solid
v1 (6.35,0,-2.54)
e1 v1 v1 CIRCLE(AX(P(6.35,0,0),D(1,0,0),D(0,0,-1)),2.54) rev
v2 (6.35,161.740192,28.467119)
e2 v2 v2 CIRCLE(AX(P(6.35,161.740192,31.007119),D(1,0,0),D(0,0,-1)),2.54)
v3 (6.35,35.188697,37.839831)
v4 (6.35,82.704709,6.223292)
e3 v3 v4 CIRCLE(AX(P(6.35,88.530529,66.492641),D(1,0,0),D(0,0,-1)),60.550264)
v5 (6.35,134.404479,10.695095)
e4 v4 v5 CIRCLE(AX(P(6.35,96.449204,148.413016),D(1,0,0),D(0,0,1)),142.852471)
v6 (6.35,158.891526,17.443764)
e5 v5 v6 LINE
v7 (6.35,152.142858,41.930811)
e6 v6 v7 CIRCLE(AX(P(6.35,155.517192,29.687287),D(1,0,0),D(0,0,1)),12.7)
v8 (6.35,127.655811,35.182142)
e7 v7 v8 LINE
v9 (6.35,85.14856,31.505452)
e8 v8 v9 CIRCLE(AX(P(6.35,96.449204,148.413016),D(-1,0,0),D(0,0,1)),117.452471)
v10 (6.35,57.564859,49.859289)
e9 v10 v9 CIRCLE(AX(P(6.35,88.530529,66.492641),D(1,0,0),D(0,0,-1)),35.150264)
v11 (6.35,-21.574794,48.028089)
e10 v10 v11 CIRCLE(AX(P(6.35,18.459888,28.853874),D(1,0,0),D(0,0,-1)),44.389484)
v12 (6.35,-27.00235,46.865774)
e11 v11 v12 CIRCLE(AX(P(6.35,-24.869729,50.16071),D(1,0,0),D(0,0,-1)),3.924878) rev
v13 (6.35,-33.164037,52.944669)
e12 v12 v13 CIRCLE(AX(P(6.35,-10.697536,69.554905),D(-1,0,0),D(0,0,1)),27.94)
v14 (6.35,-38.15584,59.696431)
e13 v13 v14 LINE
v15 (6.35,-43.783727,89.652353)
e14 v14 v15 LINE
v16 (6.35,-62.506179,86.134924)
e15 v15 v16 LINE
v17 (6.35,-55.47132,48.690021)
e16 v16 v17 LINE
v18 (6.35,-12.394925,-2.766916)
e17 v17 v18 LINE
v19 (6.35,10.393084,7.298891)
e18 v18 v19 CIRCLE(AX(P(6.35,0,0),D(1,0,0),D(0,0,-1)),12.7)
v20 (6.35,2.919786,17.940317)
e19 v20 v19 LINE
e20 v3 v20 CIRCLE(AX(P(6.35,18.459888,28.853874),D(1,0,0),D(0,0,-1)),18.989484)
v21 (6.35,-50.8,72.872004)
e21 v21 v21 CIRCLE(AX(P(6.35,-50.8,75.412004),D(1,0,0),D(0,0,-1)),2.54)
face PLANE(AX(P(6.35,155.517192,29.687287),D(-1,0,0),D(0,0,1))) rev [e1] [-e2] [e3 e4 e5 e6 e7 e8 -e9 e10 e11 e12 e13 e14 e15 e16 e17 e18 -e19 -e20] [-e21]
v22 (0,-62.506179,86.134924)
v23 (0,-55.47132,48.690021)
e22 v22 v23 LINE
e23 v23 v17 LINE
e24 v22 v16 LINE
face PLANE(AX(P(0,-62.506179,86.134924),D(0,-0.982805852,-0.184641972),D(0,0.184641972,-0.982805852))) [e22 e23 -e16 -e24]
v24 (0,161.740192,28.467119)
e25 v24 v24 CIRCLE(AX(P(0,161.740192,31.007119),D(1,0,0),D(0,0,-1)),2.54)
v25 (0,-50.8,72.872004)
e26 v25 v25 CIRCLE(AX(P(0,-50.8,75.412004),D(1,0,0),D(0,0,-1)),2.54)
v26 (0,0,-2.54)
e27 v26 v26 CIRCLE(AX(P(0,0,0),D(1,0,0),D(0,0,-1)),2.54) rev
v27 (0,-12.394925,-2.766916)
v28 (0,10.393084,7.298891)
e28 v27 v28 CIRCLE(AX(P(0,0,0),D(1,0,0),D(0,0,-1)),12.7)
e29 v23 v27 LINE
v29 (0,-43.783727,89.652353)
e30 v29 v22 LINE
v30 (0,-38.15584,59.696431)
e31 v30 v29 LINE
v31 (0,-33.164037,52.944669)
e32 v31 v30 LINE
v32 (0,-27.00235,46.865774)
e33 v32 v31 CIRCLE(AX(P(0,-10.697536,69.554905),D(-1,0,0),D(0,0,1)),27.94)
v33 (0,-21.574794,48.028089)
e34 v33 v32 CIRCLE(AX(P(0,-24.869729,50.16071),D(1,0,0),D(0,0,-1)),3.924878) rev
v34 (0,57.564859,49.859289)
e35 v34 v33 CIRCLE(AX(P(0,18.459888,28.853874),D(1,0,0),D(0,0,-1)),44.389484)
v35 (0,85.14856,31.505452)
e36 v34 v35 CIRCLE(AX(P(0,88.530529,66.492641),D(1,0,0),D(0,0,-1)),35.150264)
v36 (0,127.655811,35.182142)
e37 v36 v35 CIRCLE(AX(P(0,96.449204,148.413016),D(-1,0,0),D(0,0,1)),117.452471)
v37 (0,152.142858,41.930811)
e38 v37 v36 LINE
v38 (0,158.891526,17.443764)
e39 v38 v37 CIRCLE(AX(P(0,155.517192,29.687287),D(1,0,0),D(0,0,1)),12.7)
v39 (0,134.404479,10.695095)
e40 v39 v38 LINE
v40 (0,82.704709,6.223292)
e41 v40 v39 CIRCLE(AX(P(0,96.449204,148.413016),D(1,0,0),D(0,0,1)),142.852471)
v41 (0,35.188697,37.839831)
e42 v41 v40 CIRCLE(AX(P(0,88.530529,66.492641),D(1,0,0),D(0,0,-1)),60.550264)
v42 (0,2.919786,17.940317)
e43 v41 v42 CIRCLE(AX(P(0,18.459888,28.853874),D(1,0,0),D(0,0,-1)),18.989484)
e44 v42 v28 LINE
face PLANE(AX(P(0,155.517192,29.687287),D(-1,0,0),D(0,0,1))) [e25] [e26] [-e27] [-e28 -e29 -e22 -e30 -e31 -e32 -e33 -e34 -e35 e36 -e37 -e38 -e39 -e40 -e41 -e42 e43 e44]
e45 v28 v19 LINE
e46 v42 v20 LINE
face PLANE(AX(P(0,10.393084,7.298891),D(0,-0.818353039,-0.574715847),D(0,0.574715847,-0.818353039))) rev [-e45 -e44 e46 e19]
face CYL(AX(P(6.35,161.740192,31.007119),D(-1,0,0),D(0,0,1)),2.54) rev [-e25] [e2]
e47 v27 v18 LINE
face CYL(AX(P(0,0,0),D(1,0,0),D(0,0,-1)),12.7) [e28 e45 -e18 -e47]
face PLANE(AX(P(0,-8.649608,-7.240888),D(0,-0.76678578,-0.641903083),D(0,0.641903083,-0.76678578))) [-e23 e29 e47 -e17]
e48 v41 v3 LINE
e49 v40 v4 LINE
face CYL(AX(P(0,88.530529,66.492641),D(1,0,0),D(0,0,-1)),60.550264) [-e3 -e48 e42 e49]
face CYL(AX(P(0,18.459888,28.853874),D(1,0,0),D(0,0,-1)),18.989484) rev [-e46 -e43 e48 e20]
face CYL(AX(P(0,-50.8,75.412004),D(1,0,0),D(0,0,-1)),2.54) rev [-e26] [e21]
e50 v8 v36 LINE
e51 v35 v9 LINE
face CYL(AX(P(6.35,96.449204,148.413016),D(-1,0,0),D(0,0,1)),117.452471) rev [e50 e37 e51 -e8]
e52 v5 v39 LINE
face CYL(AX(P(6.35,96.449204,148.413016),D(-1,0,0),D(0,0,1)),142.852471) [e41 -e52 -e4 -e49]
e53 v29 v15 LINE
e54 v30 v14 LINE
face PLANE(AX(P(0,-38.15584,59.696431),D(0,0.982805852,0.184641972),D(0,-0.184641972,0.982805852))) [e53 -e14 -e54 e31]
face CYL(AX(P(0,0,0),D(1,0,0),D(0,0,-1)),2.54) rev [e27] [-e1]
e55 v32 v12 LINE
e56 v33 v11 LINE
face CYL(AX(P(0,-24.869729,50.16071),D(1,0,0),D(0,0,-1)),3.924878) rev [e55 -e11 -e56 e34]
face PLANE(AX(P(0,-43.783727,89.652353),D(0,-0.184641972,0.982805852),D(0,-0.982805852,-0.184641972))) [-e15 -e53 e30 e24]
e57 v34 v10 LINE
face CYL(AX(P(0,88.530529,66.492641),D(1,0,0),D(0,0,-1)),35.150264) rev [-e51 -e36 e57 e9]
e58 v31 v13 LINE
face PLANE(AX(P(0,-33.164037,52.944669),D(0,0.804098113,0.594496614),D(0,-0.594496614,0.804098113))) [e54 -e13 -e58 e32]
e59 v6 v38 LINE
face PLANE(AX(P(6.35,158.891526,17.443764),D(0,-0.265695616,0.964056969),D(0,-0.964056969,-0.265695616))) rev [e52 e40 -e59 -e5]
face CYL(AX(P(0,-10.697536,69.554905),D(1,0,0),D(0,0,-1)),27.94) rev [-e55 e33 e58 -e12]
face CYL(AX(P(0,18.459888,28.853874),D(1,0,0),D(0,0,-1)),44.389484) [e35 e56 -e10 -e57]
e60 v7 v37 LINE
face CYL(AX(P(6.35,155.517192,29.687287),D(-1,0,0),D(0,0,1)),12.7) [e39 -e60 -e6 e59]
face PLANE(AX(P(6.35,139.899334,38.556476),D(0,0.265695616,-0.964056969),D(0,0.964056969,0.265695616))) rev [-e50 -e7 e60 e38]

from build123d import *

# Parameters (mm, degrees)
SKETCH1_R               = 2.54
BOSS_EXTRUDE1_DEPTH     = 6.35
SKETCH2_R               = 2.54
BOSS_EXTRUDE2_DEPTH     = 6.35
CUT_EXTRUDE3_DEPTH      = 191.722024651
BOSS_EXTRUDE3_START     = -6.35
BOSS_EXTRUDE3_OUTLINE_R = 2.54
BOSS_EXTRUDE3_DEPTH     = 6.35


# Read off the part's stored shape, not the designer's step: Boss-Extrude3
with BuildPart() as part:
    # Sketch1 → Boss-Extrude1 (new body)
    with BuildSketch(Plane(origin=(0, 0, 0), x_dir=(0, 0, -1), z_dir=(1, 0, 0))):
        with BuildLine():
            Line((-44.569856196, 7.632792855), (2.7669164, -12.394925318))
            ThreePointArc((2.7669164, -12.394925318), (12.623500932, 1.391842028), (0, 12.7))
            ThreePointArc((0, 12.7), (-15.936201096, 21.312567622), (-17.462784388, 39.362730221))
            ThreePointArc((-17.462784388, 39.362730221), (-5.921340573, 86.302722272), (-10.695095154, 134.404479477))
            Line((-10.695095154, 134.404479477), (-17.44376381, 158.89152649))
            ThreePointArc((-17.44376381, 158.89152649), (-33.061621644, 167.760715668), (-41.930810822, 152.142857834))
            Line((-41.930810822, 152.142857834), (-38.556476494, 139.899334328))
            Line((-38.556476494, 139.899334328), (-35.182142166, 127.655810822))
            ThreePointArc((-35.182142166, 127.655810822), (-31.257188906, 88.106825725), (-40.746496905, 49.513037183))
            ThreePointArc((-40.746496905, 49.513037183), (-46.038128876, 28.881479889), (-44.569856196, 7.632792855))
        make_face()
        Circle(SKETCH1_R, mode=Mode.SUBTRACT)
        with Locations((-31.007118959, 161.740192162)):
            Circle(SKETCH1_R, mode=Mode.SUBTRACT)
    extrude(amount=BOSS_EXTRUDE1_DEPTH)

    # Sketch2 → Boss-Extrude2 (add)
    with BuildSketch(Plane(origin=(6.35, 0, 0), x_dir=(0, 0, -1), z_dir=(1, 0, 0))):
        with BuildLine():
            Line((-44.569856196, 7.632792855), (-42.095309311, -5.538639039))
            ThreePointArc((-42.095309311, -5.538639039), (-43.548594954, -20.911029153), (-52.944669407, -33.164037021))
            Line((-52.944669407, -33.164037021), (-59.696430917, -38.15584))
            Line((-59.696430917, -38.15584), (-89.652353277, -43.783727307))
            Line((-89.652353277, -43.783727307), (-86.13492371, -62.506178782))
            Line((-86.13492371, -62.506178782), (-48.69002076, -55.471319649))
            Line((-48.69002076, -55.471319649), (2.7669164, -12.394925318))
            Line((2.7669164, -12.394925318), (-44.569856196, 7.632792855))
        make_face()
        with Locations((-75.412004177, -50.8)):
            Circle(SKETCH2_R, mode=Mode.SUBTRACT)
    extrude(amount=-BOSS_EXTRUDE2_DEPTH)

    # Sketch7 → Cut-Extrude3 (cut, through all)
    with BuildSketch(Plane(origin=(6.35, 0, 0), x_dir=(0, 0, -1), z_dir=(1, 0, 0))):
        Polygon((-46.865774263, -27.0023496), (-22.96155218, -33.933122483), (78.29652169, 5.436064098), (-6.223292372, 82.704708682), (-31.505451919, 85.148559871), (-103.235957303, 48.493013889), align=None)
    extrude(amount=-CUT_EXTRUDE3_DEPTH, mode=Mode.SUBTRACT)


with BuildPart() as cut_extrude3_piece_1:
    # of the separate pieces the step leaves, piece 1, a body of its own (cut_extrude3_pieces)
    add(part.part.solids().sort_by_distance((0, 127.655810822, 35.182142166))[0])



with BuildPart() as cut_extrude3_piece_2:
    # of the separate pieces the step leaves, piece 2, a body of its own (cut_extrude3_pieces)
    add(part.part.solids().sort_by_distance((0, -27.0023496, 46.865774263))[0])


with BuildPart() as cut_extrude3_piece_1_1:
    add(cut_extrude3_piece_1.part)

    add(cut_extrude3_piece_2.part)  # Boss-Extrude3 merges Cut-Extrude3 piece 2
    # Boss-Extrude3 outline → Boss-Extrude3 (add)
    with BuildSketch(Plane(origin=(6.35, 0, 0), x_dir=(0, 0, -1), z_dir=(1, 0, 0)).offset(BOSS_EXTRUDE3_START)):
        with BuildLine():
            ThreePointArc((-17.94031666, 2.919785972), (-45.017090497, 8.492394425), (-37.839830784, 35.188697342))
            ThreePointArc((-37.839830784, 35.188697342), (-16.082022846, 54.987957012), (-6.223292372, 82.704708682))
            Line((-6.223292372, 82.704708682), (-31.505451919, 85.148559871))
            ThreePointArc((-31.505451919, 85.148559871), (-37.228581056, 69.058602906), (-49.859288922, 57.564859346))
            ThreePointArc((-49.859288922, 57.564859346), (-73.23147922, 17.433041422), (-48.0280892, -21.574793953))
            ThreePointArc((-48.0280892, -21.574793953), (-46.322848152, -24.047848471), (-46.865774263, -27.0023496))
            Line((-46.865774263, -27.0023496), (-22.96155218, -33.933122483))
            Line((-22.96155218, -33.933122483), (2.7669164, -12.394925318))
            ThreePointArc((2.7669164, -12.394925318), (11.617144077, 5.131467967), (-7.298891252, 10.393083589))
            Line((-7.298891252, 10.393083589), (-17.94031666, 2.919785972))
        make_face()
        Circle(BOSS_EXTRUDE3_OUTLINE_R, mode=Mode.SUBTRACT)
    extrude(amount=BOSS_EXTRUDE3_DEPTH)


solid = cut_extrude3_piece_1_1.part
